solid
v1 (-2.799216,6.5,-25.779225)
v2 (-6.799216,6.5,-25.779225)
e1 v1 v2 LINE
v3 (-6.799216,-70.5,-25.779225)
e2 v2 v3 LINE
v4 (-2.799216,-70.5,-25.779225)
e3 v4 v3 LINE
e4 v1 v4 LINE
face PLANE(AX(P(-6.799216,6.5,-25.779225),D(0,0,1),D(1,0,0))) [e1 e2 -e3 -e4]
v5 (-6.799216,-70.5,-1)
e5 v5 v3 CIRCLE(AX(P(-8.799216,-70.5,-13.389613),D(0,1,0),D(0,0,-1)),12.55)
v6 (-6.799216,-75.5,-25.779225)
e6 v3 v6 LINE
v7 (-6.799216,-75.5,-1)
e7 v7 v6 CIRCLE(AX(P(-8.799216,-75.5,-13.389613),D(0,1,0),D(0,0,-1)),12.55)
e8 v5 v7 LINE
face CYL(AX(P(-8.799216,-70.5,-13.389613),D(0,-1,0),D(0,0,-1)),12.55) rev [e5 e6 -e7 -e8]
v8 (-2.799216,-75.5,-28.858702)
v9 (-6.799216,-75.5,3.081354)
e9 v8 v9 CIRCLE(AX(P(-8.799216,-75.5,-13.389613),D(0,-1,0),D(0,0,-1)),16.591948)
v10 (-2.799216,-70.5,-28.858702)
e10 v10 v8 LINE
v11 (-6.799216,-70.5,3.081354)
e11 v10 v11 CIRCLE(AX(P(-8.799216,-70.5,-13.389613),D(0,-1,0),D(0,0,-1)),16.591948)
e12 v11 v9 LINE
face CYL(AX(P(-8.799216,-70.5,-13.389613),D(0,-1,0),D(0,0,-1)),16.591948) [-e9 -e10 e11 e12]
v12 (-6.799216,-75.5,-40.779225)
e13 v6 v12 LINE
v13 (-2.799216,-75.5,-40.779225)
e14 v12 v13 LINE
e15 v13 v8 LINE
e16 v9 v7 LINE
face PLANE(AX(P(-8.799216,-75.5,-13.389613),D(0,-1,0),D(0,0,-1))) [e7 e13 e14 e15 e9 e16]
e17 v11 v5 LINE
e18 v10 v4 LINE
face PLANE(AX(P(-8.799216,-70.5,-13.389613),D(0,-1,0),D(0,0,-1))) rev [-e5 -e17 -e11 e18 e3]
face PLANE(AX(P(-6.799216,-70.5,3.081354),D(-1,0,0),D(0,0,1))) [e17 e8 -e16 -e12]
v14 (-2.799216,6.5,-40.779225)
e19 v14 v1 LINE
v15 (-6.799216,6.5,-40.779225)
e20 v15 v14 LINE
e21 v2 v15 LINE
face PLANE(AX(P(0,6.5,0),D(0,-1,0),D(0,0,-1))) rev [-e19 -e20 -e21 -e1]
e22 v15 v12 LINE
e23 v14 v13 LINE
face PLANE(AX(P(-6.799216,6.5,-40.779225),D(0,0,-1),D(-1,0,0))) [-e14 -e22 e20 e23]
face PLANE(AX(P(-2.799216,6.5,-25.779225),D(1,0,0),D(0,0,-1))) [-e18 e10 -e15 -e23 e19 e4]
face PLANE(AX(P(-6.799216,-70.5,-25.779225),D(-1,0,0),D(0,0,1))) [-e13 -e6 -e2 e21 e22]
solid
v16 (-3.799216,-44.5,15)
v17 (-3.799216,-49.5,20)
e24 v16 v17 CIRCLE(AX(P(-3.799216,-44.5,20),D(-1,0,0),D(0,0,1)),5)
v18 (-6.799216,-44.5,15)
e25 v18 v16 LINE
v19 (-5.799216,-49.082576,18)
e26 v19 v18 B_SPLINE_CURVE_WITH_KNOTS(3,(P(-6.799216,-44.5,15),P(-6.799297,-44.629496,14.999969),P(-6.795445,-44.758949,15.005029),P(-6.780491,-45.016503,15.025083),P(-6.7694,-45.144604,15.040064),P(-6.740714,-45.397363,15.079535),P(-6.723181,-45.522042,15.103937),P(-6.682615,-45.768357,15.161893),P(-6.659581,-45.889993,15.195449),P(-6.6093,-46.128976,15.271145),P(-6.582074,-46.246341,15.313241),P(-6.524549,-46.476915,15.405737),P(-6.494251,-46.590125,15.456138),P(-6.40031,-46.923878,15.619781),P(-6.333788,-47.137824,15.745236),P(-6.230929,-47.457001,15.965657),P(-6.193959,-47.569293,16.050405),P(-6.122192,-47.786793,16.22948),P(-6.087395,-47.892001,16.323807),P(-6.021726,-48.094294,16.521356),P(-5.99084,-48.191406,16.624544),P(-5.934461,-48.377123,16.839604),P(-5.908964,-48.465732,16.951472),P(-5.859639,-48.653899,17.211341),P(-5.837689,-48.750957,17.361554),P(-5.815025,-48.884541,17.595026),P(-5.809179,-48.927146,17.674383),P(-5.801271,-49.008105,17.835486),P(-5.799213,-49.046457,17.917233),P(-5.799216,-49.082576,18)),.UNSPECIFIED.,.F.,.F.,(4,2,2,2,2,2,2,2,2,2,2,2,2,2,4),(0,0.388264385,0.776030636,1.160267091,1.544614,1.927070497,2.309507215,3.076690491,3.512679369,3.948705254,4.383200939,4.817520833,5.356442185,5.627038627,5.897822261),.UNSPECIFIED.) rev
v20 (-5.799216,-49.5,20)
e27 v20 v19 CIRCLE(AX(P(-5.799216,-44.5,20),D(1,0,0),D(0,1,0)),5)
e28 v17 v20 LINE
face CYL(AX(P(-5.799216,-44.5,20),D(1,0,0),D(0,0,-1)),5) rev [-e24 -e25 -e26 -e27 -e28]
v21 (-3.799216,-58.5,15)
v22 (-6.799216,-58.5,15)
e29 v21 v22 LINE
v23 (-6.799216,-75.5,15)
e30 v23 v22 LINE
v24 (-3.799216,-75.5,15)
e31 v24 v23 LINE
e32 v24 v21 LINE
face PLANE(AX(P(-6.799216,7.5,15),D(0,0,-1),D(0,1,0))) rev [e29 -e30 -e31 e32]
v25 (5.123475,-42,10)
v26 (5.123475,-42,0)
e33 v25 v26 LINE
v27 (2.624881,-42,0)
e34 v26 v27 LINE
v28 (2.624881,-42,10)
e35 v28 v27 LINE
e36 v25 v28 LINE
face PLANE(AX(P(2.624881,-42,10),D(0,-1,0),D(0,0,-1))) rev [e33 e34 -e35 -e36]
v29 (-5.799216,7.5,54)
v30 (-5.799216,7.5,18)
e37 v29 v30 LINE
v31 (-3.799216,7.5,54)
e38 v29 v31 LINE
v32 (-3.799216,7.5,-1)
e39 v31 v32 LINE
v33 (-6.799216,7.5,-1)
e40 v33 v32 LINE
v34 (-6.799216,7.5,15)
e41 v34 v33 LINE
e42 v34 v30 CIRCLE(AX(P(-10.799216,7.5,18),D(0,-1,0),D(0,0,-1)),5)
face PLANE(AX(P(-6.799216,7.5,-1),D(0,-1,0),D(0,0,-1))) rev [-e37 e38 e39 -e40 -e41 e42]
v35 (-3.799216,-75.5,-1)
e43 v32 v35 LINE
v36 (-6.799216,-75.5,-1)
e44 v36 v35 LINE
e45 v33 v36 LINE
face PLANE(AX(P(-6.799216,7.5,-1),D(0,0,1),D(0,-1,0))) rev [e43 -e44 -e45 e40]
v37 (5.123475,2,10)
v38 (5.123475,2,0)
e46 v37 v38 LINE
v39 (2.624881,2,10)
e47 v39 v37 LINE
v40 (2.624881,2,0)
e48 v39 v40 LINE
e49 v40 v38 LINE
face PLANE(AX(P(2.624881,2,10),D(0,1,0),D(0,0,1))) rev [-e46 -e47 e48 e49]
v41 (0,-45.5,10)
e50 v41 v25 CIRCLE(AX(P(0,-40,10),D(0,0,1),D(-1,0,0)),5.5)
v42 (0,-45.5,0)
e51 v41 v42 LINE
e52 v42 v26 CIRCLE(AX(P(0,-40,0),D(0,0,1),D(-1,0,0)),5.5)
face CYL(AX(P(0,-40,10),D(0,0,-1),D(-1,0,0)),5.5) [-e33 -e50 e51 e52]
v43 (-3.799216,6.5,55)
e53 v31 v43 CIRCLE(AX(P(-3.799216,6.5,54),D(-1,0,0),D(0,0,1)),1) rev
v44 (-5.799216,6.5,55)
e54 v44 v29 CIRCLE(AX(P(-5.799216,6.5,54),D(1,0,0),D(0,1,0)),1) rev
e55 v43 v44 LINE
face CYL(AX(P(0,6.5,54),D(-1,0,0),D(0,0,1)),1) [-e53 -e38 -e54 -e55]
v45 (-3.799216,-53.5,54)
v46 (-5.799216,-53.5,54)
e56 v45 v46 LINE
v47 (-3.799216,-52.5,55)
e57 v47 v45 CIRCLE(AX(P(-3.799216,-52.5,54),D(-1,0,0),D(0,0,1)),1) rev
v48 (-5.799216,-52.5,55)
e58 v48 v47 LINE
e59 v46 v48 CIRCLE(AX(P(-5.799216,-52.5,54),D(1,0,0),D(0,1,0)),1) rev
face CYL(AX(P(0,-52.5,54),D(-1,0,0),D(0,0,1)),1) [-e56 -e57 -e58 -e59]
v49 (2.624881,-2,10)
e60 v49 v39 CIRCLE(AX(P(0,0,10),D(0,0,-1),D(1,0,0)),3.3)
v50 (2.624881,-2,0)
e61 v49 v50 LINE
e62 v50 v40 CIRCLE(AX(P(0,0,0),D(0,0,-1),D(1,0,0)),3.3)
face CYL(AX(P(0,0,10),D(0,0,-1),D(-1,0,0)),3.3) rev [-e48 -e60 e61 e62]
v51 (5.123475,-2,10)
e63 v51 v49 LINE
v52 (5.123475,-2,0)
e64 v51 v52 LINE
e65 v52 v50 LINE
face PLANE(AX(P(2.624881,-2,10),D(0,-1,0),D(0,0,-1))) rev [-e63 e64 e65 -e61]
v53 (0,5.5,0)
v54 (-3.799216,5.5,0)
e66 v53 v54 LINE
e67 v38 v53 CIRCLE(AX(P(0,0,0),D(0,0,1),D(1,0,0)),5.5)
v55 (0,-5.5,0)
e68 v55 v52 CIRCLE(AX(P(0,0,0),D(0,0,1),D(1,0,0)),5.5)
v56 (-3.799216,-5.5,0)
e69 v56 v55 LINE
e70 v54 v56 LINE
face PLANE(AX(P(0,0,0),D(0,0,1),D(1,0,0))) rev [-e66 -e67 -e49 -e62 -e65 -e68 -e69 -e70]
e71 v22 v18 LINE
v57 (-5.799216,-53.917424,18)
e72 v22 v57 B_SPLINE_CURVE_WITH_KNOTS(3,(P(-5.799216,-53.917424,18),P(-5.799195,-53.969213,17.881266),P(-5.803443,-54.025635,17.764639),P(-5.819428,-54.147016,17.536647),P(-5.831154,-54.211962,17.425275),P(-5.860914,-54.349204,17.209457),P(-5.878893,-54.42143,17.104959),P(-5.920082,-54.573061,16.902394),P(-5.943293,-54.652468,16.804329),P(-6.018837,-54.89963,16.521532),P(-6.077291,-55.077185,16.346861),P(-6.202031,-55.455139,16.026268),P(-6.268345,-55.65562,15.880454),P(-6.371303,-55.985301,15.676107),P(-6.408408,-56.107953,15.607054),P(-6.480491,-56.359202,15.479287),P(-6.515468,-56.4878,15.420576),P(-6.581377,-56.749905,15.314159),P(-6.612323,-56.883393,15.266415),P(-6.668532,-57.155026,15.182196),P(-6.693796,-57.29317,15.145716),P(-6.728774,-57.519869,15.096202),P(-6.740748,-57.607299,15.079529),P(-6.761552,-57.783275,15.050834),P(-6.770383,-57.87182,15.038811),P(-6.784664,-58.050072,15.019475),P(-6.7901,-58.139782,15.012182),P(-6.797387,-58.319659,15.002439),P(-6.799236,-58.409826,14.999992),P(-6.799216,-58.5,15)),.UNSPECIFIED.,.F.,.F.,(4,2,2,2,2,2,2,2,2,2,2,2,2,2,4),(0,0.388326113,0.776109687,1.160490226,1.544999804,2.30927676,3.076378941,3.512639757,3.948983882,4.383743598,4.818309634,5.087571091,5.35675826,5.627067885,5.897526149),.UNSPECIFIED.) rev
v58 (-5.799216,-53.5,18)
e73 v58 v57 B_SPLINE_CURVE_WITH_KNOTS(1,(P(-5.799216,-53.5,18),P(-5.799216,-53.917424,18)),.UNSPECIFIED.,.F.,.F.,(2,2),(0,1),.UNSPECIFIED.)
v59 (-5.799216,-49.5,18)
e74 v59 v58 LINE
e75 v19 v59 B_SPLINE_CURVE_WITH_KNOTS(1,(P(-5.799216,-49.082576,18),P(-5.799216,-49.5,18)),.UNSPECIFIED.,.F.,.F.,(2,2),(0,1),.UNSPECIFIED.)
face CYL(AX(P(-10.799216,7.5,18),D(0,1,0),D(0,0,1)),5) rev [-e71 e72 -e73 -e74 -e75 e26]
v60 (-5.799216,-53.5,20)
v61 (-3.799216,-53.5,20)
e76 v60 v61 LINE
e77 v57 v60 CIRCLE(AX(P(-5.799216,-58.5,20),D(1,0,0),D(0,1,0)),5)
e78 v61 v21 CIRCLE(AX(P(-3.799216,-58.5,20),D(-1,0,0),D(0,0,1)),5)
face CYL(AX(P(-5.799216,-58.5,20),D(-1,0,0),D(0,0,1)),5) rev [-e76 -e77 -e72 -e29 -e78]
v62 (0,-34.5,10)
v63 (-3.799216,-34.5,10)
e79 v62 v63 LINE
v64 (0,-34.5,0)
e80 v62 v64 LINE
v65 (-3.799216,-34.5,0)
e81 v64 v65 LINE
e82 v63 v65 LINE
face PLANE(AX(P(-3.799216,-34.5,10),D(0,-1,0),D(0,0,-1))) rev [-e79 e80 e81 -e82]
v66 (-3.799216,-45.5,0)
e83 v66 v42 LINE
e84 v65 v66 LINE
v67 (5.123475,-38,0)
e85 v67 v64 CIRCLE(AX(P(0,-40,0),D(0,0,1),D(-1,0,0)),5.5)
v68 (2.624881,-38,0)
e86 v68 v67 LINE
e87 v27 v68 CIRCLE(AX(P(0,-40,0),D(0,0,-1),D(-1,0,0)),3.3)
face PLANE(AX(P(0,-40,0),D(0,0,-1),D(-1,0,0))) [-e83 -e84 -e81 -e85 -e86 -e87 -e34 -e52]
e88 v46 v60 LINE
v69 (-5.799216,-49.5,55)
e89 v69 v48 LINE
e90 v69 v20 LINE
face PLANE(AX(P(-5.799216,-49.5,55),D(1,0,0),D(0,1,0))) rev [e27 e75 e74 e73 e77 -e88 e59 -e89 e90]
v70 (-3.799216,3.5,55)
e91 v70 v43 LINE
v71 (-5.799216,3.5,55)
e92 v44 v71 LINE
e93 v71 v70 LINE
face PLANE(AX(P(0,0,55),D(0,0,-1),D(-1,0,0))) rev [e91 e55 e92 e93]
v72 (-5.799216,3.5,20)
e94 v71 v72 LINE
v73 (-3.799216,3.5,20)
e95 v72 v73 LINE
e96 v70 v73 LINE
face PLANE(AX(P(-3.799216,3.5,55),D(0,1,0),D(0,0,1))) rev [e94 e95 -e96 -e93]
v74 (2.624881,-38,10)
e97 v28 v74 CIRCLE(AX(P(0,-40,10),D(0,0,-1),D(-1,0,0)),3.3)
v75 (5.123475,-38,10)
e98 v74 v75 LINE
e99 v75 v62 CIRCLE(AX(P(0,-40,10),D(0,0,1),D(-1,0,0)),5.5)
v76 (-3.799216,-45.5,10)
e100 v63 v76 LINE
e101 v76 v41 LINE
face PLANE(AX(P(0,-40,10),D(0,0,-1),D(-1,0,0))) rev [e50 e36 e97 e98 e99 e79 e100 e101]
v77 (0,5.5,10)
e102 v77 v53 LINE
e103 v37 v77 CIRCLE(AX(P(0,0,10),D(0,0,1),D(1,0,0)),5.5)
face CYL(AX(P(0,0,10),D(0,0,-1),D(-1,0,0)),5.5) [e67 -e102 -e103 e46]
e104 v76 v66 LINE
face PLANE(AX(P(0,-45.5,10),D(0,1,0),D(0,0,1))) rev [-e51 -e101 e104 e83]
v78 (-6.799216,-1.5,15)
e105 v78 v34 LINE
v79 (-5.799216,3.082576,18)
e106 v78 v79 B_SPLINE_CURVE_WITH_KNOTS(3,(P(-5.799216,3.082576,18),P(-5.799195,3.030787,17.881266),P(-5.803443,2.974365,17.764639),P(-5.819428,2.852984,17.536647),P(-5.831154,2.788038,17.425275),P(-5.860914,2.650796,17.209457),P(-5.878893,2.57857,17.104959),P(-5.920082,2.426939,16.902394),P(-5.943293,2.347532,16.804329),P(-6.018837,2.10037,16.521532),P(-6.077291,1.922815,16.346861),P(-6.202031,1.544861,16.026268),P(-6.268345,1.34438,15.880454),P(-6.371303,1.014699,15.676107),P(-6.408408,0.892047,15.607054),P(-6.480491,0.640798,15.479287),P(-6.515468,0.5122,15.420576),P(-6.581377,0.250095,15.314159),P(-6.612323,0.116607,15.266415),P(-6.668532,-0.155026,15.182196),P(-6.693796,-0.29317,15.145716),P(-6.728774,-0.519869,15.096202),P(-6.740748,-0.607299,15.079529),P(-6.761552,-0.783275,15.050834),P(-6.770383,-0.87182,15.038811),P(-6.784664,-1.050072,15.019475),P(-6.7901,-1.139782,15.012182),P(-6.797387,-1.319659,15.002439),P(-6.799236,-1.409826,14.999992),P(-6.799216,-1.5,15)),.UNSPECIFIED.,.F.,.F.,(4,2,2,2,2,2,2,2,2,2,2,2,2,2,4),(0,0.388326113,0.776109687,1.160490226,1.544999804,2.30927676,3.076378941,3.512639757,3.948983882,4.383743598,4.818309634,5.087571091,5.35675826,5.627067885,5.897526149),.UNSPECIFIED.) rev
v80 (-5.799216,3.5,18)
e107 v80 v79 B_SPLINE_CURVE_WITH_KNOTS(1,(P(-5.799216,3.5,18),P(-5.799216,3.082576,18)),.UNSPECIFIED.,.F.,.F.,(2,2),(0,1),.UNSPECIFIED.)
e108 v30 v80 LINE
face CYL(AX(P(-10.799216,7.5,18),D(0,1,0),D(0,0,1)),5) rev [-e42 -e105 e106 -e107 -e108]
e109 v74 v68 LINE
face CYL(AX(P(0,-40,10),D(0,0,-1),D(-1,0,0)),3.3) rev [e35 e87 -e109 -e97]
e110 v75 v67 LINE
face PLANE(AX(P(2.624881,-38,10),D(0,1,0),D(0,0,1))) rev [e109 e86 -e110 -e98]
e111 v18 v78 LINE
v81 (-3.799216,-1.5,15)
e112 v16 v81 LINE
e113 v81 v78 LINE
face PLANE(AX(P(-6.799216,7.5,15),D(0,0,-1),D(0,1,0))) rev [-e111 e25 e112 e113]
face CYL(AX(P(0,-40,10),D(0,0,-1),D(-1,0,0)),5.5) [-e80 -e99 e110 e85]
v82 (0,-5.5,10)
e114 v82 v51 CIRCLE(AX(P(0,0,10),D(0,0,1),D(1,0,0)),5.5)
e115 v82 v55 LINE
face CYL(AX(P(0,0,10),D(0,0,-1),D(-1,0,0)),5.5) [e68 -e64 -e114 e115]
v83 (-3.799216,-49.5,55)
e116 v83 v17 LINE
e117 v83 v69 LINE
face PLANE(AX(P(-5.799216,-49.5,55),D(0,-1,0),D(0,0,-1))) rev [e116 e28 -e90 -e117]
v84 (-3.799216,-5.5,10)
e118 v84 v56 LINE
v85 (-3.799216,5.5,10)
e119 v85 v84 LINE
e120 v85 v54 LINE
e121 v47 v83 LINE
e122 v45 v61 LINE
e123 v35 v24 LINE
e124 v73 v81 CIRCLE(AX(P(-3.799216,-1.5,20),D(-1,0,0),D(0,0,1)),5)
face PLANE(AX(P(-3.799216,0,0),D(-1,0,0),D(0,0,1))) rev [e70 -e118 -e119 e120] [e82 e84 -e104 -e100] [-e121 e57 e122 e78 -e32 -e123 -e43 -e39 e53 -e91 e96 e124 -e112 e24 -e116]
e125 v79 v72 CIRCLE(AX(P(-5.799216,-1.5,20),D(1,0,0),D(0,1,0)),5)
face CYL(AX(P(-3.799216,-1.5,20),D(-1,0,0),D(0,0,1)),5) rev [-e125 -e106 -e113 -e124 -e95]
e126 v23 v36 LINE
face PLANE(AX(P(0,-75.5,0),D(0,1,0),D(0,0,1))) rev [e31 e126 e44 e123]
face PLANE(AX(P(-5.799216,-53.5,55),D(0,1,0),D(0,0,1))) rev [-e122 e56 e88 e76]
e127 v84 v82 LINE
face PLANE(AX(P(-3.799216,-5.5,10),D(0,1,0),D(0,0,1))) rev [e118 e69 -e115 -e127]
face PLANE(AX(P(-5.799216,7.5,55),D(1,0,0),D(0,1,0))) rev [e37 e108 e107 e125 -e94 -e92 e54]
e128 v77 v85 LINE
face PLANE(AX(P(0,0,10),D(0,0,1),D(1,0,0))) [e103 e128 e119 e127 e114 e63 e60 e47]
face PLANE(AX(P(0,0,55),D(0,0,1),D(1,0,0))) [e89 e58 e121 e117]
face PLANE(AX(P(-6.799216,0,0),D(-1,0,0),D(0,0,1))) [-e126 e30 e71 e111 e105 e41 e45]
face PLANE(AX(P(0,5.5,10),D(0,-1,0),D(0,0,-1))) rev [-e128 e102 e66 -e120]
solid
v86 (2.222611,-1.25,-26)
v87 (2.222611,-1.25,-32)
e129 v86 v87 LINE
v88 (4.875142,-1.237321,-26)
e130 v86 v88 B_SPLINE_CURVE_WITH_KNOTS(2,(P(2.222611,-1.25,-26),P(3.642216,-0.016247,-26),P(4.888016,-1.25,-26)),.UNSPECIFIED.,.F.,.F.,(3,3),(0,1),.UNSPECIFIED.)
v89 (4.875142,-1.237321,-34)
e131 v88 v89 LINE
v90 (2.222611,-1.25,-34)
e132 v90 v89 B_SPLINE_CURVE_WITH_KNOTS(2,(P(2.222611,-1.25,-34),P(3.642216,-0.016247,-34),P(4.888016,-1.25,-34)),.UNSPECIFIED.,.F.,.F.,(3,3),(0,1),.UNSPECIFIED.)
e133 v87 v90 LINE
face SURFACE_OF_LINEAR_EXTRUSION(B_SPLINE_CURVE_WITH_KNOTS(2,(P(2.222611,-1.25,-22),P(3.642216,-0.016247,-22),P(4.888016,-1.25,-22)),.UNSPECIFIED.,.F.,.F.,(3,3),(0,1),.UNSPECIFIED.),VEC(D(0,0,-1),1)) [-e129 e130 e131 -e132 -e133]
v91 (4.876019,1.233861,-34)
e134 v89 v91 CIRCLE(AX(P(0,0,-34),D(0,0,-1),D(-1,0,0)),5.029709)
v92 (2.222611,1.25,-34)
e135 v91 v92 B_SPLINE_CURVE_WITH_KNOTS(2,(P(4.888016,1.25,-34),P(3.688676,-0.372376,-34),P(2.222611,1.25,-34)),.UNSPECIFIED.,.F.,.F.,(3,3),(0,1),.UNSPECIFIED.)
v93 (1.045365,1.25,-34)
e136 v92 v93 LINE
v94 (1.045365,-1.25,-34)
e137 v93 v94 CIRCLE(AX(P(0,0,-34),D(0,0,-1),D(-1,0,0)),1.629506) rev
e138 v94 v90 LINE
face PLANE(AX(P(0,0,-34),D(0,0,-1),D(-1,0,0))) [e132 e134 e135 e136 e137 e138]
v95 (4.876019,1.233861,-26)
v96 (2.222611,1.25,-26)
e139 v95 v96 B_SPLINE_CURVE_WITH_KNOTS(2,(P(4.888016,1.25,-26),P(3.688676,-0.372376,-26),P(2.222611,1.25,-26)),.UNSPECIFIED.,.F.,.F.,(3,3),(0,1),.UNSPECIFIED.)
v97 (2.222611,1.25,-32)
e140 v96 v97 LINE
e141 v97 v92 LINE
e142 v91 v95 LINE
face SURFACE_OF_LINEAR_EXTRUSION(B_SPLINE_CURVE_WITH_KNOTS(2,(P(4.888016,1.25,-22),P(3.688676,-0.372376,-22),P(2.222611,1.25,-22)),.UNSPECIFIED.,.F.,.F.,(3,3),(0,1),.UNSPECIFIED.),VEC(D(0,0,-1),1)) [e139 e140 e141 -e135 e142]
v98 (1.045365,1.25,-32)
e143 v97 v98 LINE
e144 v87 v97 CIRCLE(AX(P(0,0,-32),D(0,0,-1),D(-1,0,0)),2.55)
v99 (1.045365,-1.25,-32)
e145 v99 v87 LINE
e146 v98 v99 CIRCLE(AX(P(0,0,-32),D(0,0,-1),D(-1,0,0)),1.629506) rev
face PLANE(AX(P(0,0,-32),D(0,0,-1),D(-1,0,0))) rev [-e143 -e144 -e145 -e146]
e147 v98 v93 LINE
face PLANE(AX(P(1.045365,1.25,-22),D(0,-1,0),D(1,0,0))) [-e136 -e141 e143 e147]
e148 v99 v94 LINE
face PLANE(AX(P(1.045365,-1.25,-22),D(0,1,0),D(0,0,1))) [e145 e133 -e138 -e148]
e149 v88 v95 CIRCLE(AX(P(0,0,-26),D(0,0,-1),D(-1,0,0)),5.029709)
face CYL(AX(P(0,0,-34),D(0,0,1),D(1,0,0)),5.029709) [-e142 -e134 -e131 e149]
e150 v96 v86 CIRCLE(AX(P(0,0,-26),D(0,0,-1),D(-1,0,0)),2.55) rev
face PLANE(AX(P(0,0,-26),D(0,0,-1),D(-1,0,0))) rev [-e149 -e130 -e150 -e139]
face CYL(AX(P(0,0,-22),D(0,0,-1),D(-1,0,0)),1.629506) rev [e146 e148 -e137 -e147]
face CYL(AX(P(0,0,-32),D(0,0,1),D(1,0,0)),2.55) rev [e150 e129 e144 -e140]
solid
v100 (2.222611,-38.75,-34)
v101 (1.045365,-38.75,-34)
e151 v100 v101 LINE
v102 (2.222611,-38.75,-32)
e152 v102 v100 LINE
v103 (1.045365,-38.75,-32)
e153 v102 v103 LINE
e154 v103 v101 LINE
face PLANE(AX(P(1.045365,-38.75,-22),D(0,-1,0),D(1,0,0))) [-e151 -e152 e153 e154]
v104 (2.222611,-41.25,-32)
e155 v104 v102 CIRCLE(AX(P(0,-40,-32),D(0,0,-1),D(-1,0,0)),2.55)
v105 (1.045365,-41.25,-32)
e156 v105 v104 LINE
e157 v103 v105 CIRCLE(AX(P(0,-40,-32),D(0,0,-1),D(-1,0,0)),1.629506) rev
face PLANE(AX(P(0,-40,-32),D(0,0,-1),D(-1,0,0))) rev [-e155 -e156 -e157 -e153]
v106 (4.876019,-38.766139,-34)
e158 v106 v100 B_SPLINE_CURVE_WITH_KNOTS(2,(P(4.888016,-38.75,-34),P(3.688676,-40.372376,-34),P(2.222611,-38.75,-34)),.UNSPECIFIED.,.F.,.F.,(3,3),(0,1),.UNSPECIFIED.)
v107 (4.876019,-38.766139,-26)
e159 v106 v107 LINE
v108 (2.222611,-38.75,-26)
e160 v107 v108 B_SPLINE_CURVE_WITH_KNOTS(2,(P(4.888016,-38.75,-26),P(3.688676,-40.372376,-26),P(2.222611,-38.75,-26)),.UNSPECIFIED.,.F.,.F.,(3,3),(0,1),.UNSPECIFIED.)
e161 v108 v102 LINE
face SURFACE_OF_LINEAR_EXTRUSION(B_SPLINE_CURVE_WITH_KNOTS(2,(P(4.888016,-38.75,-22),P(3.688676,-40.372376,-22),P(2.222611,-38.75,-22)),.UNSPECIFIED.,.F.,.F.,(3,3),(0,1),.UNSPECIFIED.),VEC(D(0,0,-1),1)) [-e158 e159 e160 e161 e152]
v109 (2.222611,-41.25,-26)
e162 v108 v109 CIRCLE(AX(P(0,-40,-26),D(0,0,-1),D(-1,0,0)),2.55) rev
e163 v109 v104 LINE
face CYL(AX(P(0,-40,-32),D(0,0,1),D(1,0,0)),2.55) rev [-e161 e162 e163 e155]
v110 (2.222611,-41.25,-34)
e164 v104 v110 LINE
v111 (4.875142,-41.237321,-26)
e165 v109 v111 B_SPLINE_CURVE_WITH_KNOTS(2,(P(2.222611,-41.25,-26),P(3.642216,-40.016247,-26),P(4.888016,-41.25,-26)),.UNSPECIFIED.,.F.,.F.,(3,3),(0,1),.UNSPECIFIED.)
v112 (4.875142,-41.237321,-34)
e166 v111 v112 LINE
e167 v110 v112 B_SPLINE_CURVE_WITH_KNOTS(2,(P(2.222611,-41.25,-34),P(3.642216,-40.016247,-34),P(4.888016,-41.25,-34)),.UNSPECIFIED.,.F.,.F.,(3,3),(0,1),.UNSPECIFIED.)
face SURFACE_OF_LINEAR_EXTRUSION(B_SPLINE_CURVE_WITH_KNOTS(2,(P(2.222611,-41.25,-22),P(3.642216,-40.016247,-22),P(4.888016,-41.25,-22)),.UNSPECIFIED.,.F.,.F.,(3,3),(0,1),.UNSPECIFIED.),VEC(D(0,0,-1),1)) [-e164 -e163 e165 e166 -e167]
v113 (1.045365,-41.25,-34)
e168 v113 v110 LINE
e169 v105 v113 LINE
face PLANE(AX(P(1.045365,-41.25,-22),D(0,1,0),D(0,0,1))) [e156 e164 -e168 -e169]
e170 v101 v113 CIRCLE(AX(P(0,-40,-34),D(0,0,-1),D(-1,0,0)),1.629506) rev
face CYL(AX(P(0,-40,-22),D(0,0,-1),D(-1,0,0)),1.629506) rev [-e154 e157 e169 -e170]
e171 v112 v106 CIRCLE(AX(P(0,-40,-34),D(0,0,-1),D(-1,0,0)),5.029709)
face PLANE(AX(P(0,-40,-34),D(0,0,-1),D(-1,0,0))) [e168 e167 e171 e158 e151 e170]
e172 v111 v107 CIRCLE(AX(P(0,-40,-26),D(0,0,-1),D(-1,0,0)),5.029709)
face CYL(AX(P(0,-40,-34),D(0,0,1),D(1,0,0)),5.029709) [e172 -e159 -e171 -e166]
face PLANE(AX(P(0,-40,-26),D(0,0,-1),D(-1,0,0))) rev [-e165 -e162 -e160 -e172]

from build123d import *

# Parameters (mm, degrees)
BOSS_EXTRUDE1_DEPTH     = 10
BOSS_EXTRUDE1_2_DEPTH   = 10
SKETCH2_W               = 16
SKETCH2_H               = 63
BOSS_EXTRUDE2_DEPTH     = 3
BOSS_EXTRUDE3_DEPTH     = 5
SKETCH5_W               = 4
SKETCH5_H               = 15
BOSS_EXTRUDE4_DEPTH     = 82
BOSS_EXTRUDE5_START     = 26
SKETCH7_R               = 5.029708881
BOSS_EXTRUDE5_DEPTH     = 8
SKETCH6_R               = 2.55
CUT_EXTRUDE1_DEPTH      = 32
CUT_EXTRUDE2_DEPTH      = 10
CUT_EXTRUDE2_DEPTH_BACK = 2
LPATTERN1_COUNT         = 2
LPATTERN1_PITCH         = 40
SKETCH9_W               = 2
SKETCH9_H               = 4
BOSS_EXTRUDE6_DEPTH     = 40
FILLET1_R               = 5
FILLET2_R               = 1


with BuildPart() as part:
    # Sketch1 → Boss-Extrude1 (new body)
    with BuildSketch(Plane.XY):
        with BuildLine():
            Line((0, 5.5), (-3.799215788, 5.5))
            Line((-3.799215788, 5.5), (-3.799215788, -5.5))
            Line((-3.799215788, -5.5), (0, -5.5))
            ThreePointArc((0, -5.5), (3.102418411, -4.541475531), (5.123475383, -2))
            Line((5.123475383, -2), (2.62488095, -2))
            ThreePointArc((2.62488095, -2), (-3.3, 0), (2.62488095, 2))
            Line((2.62488095, 2), (5.123475383, 2))
            ThreePointArc((5.123475383, 2), (3.102418411, 4.541475531), (0, 5.5))
        make_face()
    extrude(amount=BOSS_EXTRUDE1_DEPTH)



with BuildPart() as body_2:
    # Sketch1 → Boss-Extrude1 2 (new body)
    with BuildSketch(Plane.XY):
        with BuildLine():
            Line((2.62488095, -38), (5.123475383, -38))
            ThreePointArc((5.123475383, -38), (3.102418411, -35.458524469), (0, -34.5))
            Line((0, -34.5), (-3.799215788, -34.5))
            Line((-3.799215788, -34.5), (-3.799215788, -45.5))
            Line((-3.799215788, -45.5), (0, -45.5))
            ThreePointArc((0, -45.5), (3.102418411, -44.541475531), (5.123475383, -42))
            Line((5.123475383, -42), (2.62488095, -42))
            ThreePointArc((2.62488095, -42), (-3.3, -40), (2.62488095, -38))
        make_face()
    extrude(amount=BOSS_EXTRUDE1_2_DEPTH)


with BuildPart() as part_1:
    add(part.part)

    add(body_2.part)  # Boss-Extrude2 merges body 2
    # Sketch2 → Boss-Extrude2 (add)
    with BuildSketch(Plane.ZY.offset(3.799215788)):
        with Locations((7, -24)):
            Rectangle(SKETCH2_W, SKETCH2_H)
    extrude(amount=BOSS_EXTRUDE2_DEPTH)

    # Sketch3 → section 1 of loft1
    with BuildSketch(Plane(origin=(0, -75.5, 0), x_dir=(-1, 0, 0), z_dir=(0, -1, 0)), mode=Mode.PRIVATE) as loft1_s1:
        with BuildLine():
            Line((6.799215788, 1), (3.799215788, 1))
            Line((3.799215788, 1), (3.799215788, -15))
            Line((3.799215788, -15), (6.799215788, -15))
            Line((6.799215788, -15), (6.799215788, 1))
        make_face()
    # loft from a face of the part (loft1)
    loft([part_1.faces().sort_by_distance((-5.299215788, -55.5, 7))[0], loft1_s1.sketch])

    # Sketch9 → Boss-Extrude6 (add)
    with BuildSketch(Plane.XY.offset(15)):
        with Locations((-4.799215788, 5.5)):
            Rectangle(SKETCH9_W, SKETCH9_H)
        with Locations((-4.799215788, -51.5)):
            Rectangle(SKETCH9_W, SKETCH9_H)
    extrude(amount=BOSS_EXTRUDE6_DEPTH)

    # Fillet1
    # the kernel refuses this fillet: 5 mm, written as the material it adds along each edge
    with BuildSketch(Plane(origin=(-5.799215788, 7.5, 15), x_dir=(0, 0, 1), z_dir=(0, -1, 0))) as fillet1_piece_1:
        with BuildLine():
            CenterArc((3, 5), FILLET1_R, 233.130102354, 36.869897646)
            Line((0, 1), (-0.06, 0.92))
            ThreePointArc((-0.06, 0.92), (-0.1, 0.5), (-0.1, 0))
            Line((-0.1, 0), (0, -0.1))
            Line((0, -0.1), (3, -0.1))
            Line((3, -0.1), (3, 0))
        make_face()
    extrude(amount=4)
    with BuildSketch(Plane(origin=(-5.799215788, -53.5, 15), x_dir=(0, 0, 1), z_dir=(0, 1, 0))) as fillet1_piece_2:
        with BuildLine():
            CenterArc((3, -5), FILLET1_R, 90, 36.869897646)
            Line((0, -1), (-0.06, -0.92))
            ThreePointArc((-0.06, -0.92), (-0.1, -0.5), (-0.1, 0))
            Line((-0.1, 0), (0, 0.1))
            Line((0, 0.1), (3, 0.1))
            Line((3, 0.1), (3, 0))
        make_face()
    extrude(amount=4)
    with BuildSketch(Plane(origin=(-5.799215788, -49.5, 15), x_dir=(0, 0, 1), z_dir=(1, 0, 0)), Plane(origin=(-3.799215788, -53.5, 15), x_dir=(0, 0, 1), z_dir=(-1, 0, 0))) as fillet1_piece_3:
        with BuildLine():
            CenterArc((FILLET1_R, -FILLET1_R), FILLET1_R, 90, 90)
            Line((0, -FILLET1_R), (-FILLET1_R * 0.02, -FILLET1_R))
            Line((-FILLET1_R * 0.02, -FILLET1_R), (-FILLET1_R * 0.02, FILLET1_R * 0.02))
            Line((-FILLET1_R * 0.02, FILLET1_R * 0.02), (FILLET1_R, FILLET1_R * 0.02))
            Line((FILLET1_R, FILLET1_R * 0.02), (FILLET1_R, 0))
        make_face()
    extrude(amount=2)
    with BuildSketch(Plane(origin=(-5.799215788, 3.5, 15), x_dir=(0, 0, 1), z_dir=(1, 0, 0))) as fillet1_piece_4:
        with BuildLine():
            CenterArc((FILLET1_R, FILLET1_R), FILLET1_R, 180, 90)
            Line((0, FILLET1_R), (-FILLET1_R * 0.02, FILLET1_R))
            Line((-FILLET1_R * 0.02, FILLET1_R), (-FILLET1_R * 0.02, -FILLET1_R * 0.02))
            Line((-FILLET1_R * 0.02, -FILLET1_R * 0.02), (FILLET1_R, -FILLET1_R * 0.02))
            Line((FILLET1_R, -FILLET1_R * 0.02), (FILLET1_R, 0))
        make_face()
    extrude(amount=2)
    with BuildSketch(Plane(origin=(-18.299215788, 3.5, 15), x_dir=(0, 0, 1), z_dir=(1, 0, 0))) as fillet1_piece_5a_section:
        with BuildLine():
            CenterArc((FILLET1_R, FILLET1_R), FILLET1_R, 180, 90)
            Line((0, FILLET1_R), (-FILLET1_R * 0.02, FILLET1_R))
            Line((-FILLET1_R * 0.02, FILLET1_R), (-FILLET1_R * 0.02, -FILLET1_R * 0.02))
            Line((-FILLET1_R * 0.02, -FILLET1_R * 0.02), (FILLET1_R, -FILLET1_R * 0.02))
            Line((FILLET1_R, -FILLET1_R * 0.02), (FILLET1_R, 0))
        make_face()
    fillet1_piece_5a = extrude(amount=14.5, mode=Mode.PRIVATE)
    fillet1_piece_5a = split(fillet1_piece_5a, bisect_by=Plane(origin=(-5.799215788, 2.368024429, 16.131975571), z_dir=(-1, 0, 0)), keep=Keep.TOP, mode=Mode.PRIVATE)
    fillet1_piece_5a = split(fillet1_piece_5a, bisect_by=Plane(origin=(-6.799215788, 2.368024429, 16.131975571), z_dir=(1, 0, 0)), keep=Keep.TOP, mode=Mode.PRIVATE)
    with BuildSketch(Plane(origin=(-5.799215788, 7.5, 15), x_dir=(0, 0, 1), z_dir=(0, -1, 0))) as fillet1_piece_5b_section:
        with BuildLine():
            CenterArc((3, 5), FILLET1_R, 233.130102354, 36.869897646)
            Line((0, 1), (-0.06, 0.92))
            ThreePointArc((-0.06, 0.92), (-0.1, 0.5), (-0.1, 0))
            Line((-0.1, 0), (0, -0.1))
            Line((0, -0.1), (3, -0.1))
            Line((3, -0.1), (3, 0))
        make_face()
    fillet1_piece_5b = extrude(amount=11.5, mode=Mode.PRIVATE)
    fillet1_piece_5b = split(fillet1_piece_5b, bisect_by=Plane(origin=(-6.025404186, 3.5, 15.849672813), z_dir=(0, -1, 0)), keep=Keep.TOP, mode=Mode.PRIVATE)
    fillet1_piece_5 = fillet1_piece_5a & fillet1_piece_5b
    add(fillet1_piece_5)
    with BuildSketch(Plane(origin=(-3.799215788, -53.5, 15), x_dir=(0, 0, 1), z_dir=(-1, 0, 0))) as fillet1_piece_6a_section:
        with BuildLine():
            CenterArc((FILLET1_R, -FILLET1_R), FILLET1_R, 90, 90)
            Line((0, -FILLET1_R), (-FILLET1_R * 0.02, -FILLET1_R))
            Line((-FILLET1_R * 0.02, -FILLET1_R), (-FILLET1_R * 0.02, FILLET1_R * 0.02))
            Line((-FILLET1_R * 0.02, FILLET1_R * 0.02), (FILLET1_R, FILLET1_R * 0.02))
            Line((FILLET1_R, FILLET1_R * 0.02), (FILLET1_R, 0))
        make_face()
    fillet1_piece_6a = extrude(amount=14.5, mode=Mode.PRIVATE)
    fillet1_piece_6a = split(fillet1_piece_6a, bisect_by=Plane(origin=(-5.799215788, -54.631975571, 16.131975571), z_dir=(-1, 0, 0)), keep=Keep.TOP, mode=Mode.PRIVATE)
    fillet1_piece_6a = split(fillet1_piece_6a, bisect_by=Plane(origin=(-6.799215788, -54.631975571, 16.131975571), z_dir=(1, 0, 0)), keep=Keep.TOP, mode=Mode.PRIVATE)
    with BuildSketch(Plane(origin=(-5.799215788, -61, 15), x_dir=(0, 0, 1), z_dir=(0, 1, 0))) as fillet1_piece_6b_section:
        with BuildLine():
            CenterArc((3, -5), FILLET1_R, 90, 36.869897646)
            Line((0, -1), (-0.06, -0.92))
            ThreePointArc((-0.06, -0.92), (-0.1, -0.5), (-0.1, 0))
            Line((-0.1, 0), (0, 0.1))
            Line((0, 0.1), (3, 0.1))
            Line((3, 0.1), (3, 0))
        make_face()
    fillet1_piece_6b = extrude(amount=11.5, mode=Mode.PRIVATE)
    fillet1_piece_6b = split(fillet1_piece_6b, bisect_by=Plane(origin=(-6.025404186, -53.5, 15.849672813), z_dir=(0, -1, 0)), keep=Keep.TOP, mode=Mode.PRIVATE)
    fillet1_piece_6 = fillet1_piece_6a & fillet1_piece_6b
    add(fillet1_piece_6)
    with BuildSketch(Plane(origin=(-5.799215788, -53.5, 15), x_dir=(0, 0, 1), z_dir=(0, 1, 0))) as fillet1_piece_7a_section:
        with BuildLine():
            CenterArc((3, -5), FILLET1_R, 90, 36.869897646)
            Line((0, -1), (-0.06, -0.92))
            ThreePointArc((-0.06, -0.92), (-0.1, -0.5), (-0.1, 0))
            Line((-0.1, 0), (0, 0.1))
            Line((0, 0.1), (3, 0.1))
            Line((3, 0.1), (3, 0))
        make_face()
    fillet1_piece_7a = extrude(amount=11.5, mode=Mode.PRIVATE)
    fillet1_piece_7a = split(fillet1_piece_7a, bisect_by=Plane(origin=(-6.025404186, -49.5, 15.849672813), z_dir=(0, 1, 0)), keep=Keep.TOP, mode=Mode.PRIVATE)
    with BuildSketch(Plane(origin=(-18.299215788, -49.5, 15), x_dir=(0, 0, 1), z_dir=(1, 0, 0))) as fillet1_piece_7b_section:
        with BuildLine():
            CenterArc((FILLET1_R, -FILLET1_R), FILLET1_R, 90, 90)
            Line((0, -FILLET1_R), (-FILLET1_R * 0.02, -FILLET1_R))
            Line((-FILLET1_R * 0.02, -FILLET1_R), (-FILLET1_R * 0.02, FILLET1_R * 0.02))
            Line((-FILLET1_R * 0.02, FILLET1_R * 0.02), (FILLET1_R, FILLET1_R * 0.02))
            Line((FILLET1_R, FILLET1_R * 0.02), (FILLET1_R, 0))
        make_face()
    fillet1_piece_7b = extrude(amount=14.5, mode=Mode.PRIVATE)
    fillet1_piece_7b = split(fillet1_piece_7b, bisect_by=Plane(origin=(-5.799215788, -48.368024429, 16.131975571), z_dir=(-1, 0, 0)), keep=Keep.TOP, mode=Mode.PRIVATE)
    fillet1_piece_7b = split(fillet1_piece_7b, bisect_by=Plane(origin=(-6.799215788, -48.368024429, 16.131975571), z_dir=(1, 0, 0)), keep=Keep.TOP, mode=Mode.PRIVATE)
    fillet1_piece_7 = fillet1_piece_7a & fillet1_piece_7b
    add(fillet1_piece_7)

    # Fillet2
    fillet2_edges = [part_1.edges().sort_by_distance(p)[0] for p in [
        (-4.799215788, 7.5, 55),
        (-4.799215788, -53.5, 55),
    ]]
    fillet(fillet2_edges, radius=FILLET2_R)


with BuildPart() as body_2_2:
    # Sketch4 → Boss-Extrude3 (new body)
    with BuildSketch(Plane.XZ.offset(75.5)):
        with BuildLine():
            Line((-6.799215788, 3.081354008), (-6.799215788, -1))
            ThreePointArc((-6.799215788, -1), (3.750784212, -13.389612585), (-6.799215788, -25.779225169))
            Line((-6.799215788, -25.779225169), (-6.799215788, -29.860579178))
            ThreePointArc((-6.799215788, -29.860579178), (7.792732274, -13.389612585), (-6.799215788, 3.081354008))
        make_face()
    extrude(amount=-BOSS_EXTRUDE3_DEPTH)

    # Sketch5 → Boss-Extrude4 (add)
    with BuildSketch(Plane.XZ.offset(75.5)):
        with Locations((-4.799215788, -33.279225169)):
            Rectangle(SKETCH5_W, SKETCH5_H)
    extrude(amount=-BOSS_EXTRUDE4_DEPTH)


with BuildPart() as body_3:
    # Sketch7 → Boss-Extrude5 (new body)
    with BuildSketch(Plane(origin=(0, 0, 0), x_dir=(-1, 0, 0), z_dir=(0, 0, -1)).offset(BOSS_EXTRUDE5_START)):
        Circle(SKETCH7_R)
    extrude(amount=BOSS_EXTRUDE5_DEPTH)

    # Sketch6 → Cut-Extrude1 (cut)
    with BuildSketch(Plane(origin=(0, 0, 0), x_dir=(-1, 0, 0), z_dir=(0, 0, -1))):
        Circle(SKETCH6_R)
    extrude(amount=CUT_EXTRUDE1_DEPTH, mode=Mode.SUBTRACT)

    # Sketch8 → Cut-Extrude2 (cut, two sides: drawn at the far end of the back side and taken through both)
    with BuildSketch(Plane.XY.offset(-32).offset(-CUT_EXTRUDE2_DEPTH_BACK)):
        with BuildLine():
            Line((4.8880156, -1.25), (6.306665545, -1.25))
            Line((6.306665545, -1.25), (6.306665545, 1.25))
            Line((6.306665545, 1.25), (4.8880156, 1.25))
            add(Edge.make_bspline(
                [(4.8880156, 1.25), (3.688676314, -0.372376085), (2.222611077, 1.25)],
                knots=[0, 0, 0, 1, 1, 1], degree=2))
            Line((2.222611077, 1.25), (1.045365469, 1.25))
            ThreePointArc((1.045365469, 1.25), (-1.629505742, 0), (1.045365469, -1.25))
            Line((1.045365469, -1.25), (2.222611077, -1.25))
            add(Edge.make_bspline(
                [(4.8880156, -1.25), (3.642215678, -0.016247262), (2.222611077, -1.25)],
                knots=[0, 0, 0, 1, 1, 1], degree=2))
        make_face()
    extrude(amount=CUT_EXTRUDE2_DEPTH + CUT_EXTRUDE2_DEPTH_BACK, mode=Mode.SUBTRACT)


with BuildPart() as lpattern1_1:
    # LPattern1: pattern copy
    add(body_3.part.moved(Location(Vector(0, -1, 0) * (1 * LPATTERN1_PITCH))))


solid = Compound([part_1.part, body_2_2.part, body_3.part, lpattern1_1.part])
